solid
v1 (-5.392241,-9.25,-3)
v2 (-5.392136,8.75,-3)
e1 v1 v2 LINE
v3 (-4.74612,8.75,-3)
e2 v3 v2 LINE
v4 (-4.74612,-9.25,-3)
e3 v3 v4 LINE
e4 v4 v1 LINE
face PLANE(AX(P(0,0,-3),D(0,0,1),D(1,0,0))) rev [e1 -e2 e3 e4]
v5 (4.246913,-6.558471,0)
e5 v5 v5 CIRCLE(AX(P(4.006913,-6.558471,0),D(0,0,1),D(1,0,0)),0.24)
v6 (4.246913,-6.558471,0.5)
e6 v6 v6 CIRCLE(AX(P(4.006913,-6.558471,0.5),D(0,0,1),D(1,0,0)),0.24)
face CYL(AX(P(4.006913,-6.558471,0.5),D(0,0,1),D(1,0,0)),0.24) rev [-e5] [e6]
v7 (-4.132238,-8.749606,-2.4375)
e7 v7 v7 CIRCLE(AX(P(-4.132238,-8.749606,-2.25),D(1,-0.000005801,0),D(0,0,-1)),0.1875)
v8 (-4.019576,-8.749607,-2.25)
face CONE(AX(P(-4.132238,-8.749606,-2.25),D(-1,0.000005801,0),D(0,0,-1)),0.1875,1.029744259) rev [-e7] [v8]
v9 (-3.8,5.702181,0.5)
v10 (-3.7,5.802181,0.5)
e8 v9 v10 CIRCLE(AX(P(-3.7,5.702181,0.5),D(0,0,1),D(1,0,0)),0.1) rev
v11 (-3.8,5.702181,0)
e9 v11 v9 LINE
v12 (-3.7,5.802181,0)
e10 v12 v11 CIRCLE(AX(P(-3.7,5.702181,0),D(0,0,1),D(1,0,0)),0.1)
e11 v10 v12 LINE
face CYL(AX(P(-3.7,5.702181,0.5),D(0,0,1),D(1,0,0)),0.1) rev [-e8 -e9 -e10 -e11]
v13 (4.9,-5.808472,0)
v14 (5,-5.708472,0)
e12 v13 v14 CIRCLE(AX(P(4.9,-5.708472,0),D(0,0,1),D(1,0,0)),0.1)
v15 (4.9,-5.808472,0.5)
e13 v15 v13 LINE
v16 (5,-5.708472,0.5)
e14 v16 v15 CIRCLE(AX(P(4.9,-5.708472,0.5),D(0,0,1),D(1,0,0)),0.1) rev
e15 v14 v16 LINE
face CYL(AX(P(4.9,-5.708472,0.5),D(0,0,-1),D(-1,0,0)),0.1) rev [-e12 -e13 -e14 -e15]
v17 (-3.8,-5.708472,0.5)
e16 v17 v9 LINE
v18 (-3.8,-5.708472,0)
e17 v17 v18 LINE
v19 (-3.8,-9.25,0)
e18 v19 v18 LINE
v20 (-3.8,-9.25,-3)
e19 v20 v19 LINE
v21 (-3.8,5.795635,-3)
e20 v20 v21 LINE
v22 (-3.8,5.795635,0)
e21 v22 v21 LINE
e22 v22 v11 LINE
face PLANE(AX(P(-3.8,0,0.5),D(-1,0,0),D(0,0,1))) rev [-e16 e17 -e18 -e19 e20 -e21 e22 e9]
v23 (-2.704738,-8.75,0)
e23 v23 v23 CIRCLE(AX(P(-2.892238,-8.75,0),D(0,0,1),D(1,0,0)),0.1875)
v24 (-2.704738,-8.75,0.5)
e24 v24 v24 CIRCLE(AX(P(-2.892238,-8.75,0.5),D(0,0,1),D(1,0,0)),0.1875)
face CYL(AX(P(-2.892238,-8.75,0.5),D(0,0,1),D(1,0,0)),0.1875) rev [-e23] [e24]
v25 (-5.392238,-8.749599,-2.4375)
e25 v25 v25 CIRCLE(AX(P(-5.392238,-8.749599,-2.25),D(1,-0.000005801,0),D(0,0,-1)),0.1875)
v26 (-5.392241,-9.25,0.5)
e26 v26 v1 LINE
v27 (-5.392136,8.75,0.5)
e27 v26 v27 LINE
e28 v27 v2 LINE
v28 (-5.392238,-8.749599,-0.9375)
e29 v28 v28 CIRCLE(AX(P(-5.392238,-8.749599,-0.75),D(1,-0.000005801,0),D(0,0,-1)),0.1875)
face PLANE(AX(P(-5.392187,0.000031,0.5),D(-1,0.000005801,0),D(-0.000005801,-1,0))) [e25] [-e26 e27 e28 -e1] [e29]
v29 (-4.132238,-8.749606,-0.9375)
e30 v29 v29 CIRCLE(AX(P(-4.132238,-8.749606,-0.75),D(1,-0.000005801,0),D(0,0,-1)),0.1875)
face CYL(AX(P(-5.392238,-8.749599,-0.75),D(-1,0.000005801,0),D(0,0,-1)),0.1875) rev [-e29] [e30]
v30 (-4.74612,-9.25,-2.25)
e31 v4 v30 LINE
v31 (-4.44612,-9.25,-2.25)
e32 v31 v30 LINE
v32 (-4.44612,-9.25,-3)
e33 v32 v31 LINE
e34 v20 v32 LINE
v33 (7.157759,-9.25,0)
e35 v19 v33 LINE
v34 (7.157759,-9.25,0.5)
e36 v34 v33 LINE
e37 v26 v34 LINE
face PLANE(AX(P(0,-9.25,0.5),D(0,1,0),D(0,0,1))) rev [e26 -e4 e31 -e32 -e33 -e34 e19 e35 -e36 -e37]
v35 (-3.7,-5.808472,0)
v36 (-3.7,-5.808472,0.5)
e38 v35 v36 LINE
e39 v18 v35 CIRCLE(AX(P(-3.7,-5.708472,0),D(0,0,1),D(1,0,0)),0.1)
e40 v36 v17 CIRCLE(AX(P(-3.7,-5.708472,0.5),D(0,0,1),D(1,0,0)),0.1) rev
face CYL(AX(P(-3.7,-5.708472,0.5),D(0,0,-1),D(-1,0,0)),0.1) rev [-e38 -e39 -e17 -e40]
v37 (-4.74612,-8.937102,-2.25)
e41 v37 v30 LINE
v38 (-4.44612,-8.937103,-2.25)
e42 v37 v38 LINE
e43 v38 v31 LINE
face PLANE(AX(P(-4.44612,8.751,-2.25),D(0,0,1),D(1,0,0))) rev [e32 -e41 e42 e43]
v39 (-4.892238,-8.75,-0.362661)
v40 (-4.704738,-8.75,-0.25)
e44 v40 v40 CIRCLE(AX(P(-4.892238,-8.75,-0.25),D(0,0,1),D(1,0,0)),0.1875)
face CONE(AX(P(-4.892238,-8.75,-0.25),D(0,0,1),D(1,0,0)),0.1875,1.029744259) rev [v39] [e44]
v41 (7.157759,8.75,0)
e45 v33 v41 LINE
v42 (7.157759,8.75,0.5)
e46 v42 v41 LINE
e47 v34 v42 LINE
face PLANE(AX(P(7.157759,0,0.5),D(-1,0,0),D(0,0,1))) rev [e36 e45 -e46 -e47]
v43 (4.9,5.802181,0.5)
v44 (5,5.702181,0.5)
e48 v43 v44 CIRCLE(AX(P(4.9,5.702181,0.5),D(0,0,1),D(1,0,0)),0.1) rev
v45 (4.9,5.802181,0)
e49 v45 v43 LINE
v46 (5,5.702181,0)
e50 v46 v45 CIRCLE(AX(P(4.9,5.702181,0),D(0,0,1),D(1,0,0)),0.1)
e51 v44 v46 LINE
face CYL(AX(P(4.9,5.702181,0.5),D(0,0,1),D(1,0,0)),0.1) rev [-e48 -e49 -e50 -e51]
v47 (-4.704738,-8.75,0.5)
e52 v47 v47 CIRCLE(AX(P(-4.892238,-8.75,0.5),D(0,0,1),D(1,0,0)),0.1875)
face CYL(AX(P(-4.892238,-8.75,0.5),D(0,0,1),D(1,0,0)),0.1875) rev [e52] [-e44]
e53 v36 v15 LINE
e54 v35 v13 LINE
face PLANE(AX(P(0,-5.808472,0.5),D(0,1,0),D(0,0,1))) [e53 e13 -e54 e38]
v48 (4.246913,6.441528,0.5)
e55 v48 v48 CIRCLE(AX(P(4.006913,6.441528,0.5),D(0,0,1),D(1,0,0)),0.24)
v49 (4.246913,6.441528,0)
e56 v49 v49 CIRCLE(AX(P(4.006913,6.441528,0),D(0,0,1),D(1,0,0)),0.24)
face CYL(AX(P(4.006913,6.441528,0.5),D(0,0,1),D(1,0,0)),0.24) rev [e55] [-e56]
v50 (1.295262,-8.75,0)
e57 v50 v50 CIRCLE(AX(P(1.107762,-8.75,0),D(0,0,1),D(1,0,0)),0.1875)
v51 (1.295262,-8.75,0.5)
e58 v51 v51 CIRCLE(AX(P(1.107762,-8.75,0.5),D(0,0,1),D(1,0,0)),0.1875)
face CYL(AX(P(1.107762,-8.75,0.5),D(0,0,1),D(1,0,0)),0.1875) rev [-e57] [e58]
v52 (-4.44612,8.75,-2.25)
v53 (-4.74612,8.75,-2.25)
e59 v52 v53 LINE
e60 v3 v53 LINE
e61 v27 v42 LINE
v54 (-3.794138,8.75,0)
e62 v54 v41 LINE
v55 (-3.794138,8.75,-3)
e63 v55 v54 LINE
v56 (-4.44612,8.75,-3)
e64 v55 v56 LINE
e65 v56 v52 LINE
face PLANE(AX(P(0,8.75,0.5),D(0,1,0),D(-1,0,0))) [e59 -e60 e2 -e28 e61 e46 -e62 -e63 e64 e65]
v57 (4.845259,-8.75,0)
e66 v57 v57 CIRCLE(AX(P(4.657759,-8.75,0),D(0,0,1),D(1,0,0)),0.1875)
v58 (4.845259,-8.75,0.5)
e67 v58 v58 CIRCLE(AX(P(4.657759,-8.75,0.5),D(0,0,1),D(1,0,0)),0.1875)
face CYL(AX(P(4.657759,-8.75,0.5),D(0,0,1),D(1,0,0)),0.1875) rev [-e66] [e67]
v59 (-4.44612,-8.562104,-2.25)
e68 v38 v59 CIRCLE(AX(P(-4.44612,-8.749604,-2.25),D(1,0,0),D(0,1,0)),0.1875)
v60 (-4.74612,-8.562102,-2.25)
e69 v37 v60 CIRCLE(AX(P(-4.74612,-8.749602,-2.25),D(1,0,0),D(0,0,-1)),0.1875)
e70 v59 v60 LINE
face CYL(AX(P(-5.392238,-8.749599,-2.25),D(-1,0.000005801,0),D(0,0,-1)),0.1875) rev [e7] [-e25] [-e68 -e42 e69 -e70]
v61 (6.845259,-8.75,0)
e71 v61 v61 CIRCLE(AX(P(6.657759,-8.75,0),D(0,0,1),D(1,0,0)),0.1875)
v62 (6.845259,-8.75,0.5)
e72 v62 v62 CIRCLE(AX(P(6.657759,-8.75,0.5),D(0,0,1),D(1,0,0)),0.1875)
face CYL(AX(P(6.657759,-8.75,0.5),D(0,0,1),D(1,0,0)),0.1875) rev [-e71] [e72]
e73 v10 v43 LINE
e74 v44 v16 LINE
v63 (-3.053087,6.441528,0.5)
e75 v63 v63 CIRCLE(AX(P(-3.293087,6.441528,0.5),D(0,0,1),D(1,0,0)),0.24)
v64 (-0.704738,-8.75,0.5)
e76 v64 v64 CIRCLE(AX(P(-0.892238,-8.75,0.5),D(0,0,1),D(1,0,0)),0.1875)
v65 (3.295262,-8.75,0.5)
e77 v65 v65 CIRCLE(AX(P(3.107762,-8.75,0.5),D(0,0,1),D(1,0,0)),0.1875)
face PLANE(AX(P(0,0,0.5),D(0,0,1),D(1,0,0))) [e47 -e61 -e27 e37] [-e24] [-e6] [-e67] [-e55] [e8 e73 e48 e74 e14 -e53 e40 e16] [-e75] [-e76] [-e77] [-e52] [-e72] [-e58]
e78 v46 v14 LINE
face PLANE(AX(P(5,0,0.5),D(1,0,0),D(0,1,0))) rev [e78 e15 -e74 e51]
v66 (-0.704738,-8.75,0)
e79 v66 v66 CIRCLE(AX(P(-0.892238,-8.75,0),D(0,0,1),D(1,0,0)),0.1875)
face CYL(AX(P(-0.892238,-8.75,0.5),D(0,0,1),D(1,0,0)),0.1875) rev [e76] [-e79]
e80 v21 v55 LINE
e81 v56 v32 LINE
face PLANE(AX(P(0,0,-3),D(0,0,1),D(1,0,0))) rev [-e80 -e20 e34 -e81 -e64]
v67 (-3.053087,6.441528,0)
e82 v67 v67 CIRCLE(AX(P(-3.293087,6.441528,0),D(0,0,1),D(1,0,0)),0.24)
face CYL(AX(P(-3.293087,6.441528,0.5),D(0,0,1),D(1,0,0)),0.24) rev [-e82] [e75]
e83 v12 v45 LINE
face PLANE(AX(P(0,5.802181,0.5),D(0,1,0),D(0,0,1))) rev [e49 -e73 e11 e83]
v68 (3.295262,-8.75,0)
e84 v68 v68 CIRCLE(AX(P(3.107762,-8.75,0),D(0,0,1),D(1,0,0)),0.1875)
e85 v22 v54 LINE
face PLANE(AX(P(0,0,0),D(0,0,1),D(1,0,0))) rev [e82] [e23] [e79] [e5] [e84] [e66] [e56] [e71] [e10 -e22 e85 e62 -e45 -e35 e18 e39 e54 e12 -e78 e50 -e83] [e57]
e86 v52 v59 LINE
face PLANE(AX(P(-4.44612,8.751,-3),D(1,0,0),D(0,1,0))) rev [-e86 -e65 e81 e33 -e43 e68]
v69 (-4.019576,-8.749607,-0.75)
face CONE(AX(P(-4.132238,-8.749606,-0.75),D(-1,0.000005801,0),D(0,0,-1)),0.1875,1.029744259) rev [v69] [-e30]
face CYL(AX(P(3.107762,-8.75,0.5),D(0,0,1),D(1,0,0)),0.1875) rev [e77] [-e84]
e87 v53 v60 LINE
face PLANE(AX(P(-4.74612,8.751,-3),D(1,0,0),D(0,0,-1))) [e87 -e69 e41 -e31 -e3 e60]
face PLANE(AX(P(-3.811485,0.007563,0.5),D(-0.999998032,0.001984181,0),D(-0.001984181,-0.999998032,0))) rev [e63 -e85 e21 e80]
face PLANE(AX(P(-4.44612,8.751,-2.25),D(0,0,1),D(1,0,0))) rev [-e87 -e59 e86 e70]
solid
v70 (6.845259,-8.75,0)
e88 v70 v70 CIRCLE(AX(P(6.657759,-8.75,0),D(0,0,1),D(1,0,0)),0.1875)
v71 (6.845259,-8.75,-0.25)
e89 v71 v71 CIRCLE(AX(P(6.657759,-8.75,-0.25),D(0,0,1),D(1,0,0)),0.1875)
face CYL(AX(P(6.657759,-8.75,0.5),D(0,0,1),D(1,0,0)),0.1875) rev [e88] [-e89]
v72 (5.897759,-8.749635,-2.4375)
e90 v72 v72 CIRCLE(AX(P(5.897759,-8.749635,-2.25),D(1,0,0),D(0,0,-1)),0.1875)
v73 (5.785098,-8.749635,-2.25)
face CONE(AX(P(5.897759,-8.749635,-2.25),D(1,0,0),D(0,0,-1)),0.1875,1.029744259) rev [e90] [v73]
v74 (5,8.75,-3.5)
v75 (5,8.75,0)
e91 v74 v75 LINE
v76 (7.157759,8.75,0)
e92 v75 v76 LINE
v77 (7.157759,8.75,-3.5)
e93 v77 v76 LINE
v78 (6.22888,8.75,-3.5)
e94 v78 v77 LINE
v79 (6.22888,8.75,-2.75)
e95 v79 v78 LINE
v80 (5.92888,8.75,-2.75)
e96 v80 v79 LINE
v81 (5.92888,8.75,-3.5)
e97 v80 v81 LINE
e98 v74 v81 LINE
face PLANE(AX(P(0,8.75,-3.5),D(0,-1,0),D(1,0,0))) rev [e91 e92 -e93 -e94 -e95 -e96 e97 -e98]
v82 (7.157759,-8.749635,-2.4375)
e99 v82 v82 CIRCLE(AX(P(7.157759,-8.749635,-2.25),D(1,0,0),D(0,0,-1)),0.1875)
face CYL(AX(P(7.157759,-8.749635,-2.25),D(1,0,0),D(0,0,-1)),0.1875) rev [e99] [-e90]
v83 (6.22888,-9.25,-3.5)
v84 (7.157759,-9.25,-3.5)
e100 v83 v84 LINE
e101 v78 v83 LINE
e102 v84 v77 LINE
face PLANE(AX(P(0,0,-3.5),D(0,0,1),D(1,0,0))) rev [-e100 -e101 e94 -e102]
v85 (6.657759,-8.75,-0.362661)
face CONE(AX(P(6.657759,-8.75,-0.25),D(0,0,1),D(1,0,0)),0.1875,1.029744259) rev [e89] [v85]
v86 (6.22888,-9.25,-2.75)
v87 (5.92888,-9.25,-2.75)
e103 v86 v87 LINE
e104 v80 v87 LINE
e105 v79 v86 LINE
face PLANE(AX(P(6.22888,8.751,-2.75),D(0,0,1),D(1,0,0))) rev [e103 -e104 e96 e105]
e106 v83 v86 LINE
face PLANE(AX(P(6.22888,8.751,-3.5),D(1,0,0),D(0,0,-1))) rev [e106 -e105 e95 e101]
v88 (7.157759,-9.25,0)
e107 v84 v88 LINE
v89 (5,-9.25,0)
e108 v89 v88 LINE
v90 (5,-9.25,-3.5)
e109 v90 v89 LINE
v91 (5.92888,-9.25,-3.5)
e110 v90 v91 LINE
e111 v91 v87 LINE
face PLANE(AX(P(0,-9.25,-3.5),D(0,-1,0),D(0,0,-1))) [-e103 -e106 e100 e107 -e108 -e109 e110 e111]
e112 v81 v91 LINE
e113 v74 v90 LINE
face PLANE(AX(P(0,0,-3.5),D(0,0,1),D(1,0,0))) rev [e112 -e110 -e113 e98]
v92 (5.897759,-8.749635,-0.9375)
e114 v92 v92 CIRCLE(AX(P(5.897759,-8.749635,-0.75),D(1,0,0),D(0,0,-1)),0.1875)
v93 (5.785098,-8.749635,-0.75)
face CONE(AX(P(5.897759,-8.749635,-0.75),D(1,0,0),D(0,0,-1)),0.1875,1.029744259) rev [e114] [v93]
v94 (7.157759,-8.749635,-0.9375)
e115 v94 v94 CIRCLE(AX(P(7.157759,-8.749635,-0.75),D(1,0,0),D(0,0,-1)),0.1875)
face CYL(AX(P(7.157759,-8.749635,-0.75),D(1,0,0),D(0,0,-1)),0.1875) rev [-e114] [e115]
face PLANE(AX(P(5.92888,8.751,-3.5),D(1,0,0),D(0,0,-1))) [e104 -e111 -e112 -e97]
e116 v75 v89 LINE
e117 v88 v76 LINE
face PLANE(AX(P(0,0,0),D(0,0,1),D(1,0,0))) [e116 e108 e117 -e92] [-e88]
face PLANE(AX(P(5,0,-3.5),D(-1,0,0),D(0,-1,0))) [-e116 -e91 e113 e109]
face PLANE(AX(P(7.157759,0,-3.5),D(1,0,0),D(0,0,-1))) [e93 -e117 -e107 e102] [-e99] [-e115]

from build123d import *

# Parameters (mm, degrees)
BOSS_EXTRUDE1_DEPTH                = 0.5
SKETCH4_3_W                        = 2.157759448
SKETCH4_3_H                        = 18
BOSS_EXTRUDE2_DEPTH                = 3.5
BOSS_EXTRUDE3_DEPTH                = 3
FILLET1_R                          = 0.1
SKETCH26_W                         = 0.24
SKETCH26_H                         = 4
SKETCH28_W                         = 0.3
SKETCH28_H                         = 0.75
CUT_EXTRUDE1_DEPTH                 = 18
M0_5X0_125_TAPPED_HOLE1_AT_2_COUNT = 2
M0_5X0_125_TAPPED_HOLE1_AT_2_PITCH = 11.549997101
M0_5X0_125_TAPPED_HOLE1_AT_3_COUNT = 2
M0_5X0_125_TAPPED_HOLE1_AT_3_PITCH = 2
M0_5X0_125_TAPPED_HOLE1_AT_4_COUNT = 2
M0_5X0_125_TAPPED_HOLE1_AT_4_PITCH = 4
M0_5X0_125_TAPPED_HOLE1_AT_5_COUNT = 2
M0_5X0_125_TAPPED_HOLE1_AT_5_PITCH = 6
M0_5X0_125_TAPPED_HOLE1_AT_6_COUNT = 2
M0_5X0_125_TAPPED_HOLE1_AT_6_PITCH = 8
M0_5X0_125_TAPPED_HOLE1_AT_7_COUNT = 2
M0_5X0_125_TAPPED_HOLE1_AT_7_PITCH = 9.549997101
M0_5X0_125_TAPPED_HOLE2_AT_2_COUNT = 2
M0_5X0_125_TAPPED_HOLE2_AT_2_PITCH = 1.5
MIRROR9_START                      = -6
MIRROR9_OUTLINE_R                  = 0.1875
MIRROR9_DEPTH                      = 1.867813005


with BuildPart() as part:
    # Sketch4 → Boss-Extrude1 (new body)
    with BuildSketch(Plane(origin=(5.549975664, -0.767698462, 0), x_dir=(1, 0, 0), z_dir=(0, 0, 1))):
        Polygon((-10.942216218, -8.482301538), (1.607783784, -8.482301538), (1.607783784, 9.517698462), (-10.942111801, 9.517698462), align=None)
        Polygon((-0.549975664, -5.040773631), (-9.349975664, -5.040773631), (-9.349975664, 6.563333727), (-9.349962677, 6.569879134), (-0.549975664, 6.569879134), align=None, mode=Mode.SUBTRACT)
    extrude(amount=BOSS_EXTRUDE1_DEPTH)

    # Sketch4<5> → Boss-Extrude3 (add)
    with BuildSketch(Plane(origin=(5.549975664, -0.767698462, 0), x_dir=(1, 0, 0), z_dir=(0, 0, 1))):
        Polygon((-10.942216218, -8.482301538), (-9.349975664, -8.482301538), (-9.349975664, 6.563333727), (-9.34411366, 9.517698462), (-10.942111801, 9.517698462), align=None)
    extrude(amount=-BOSS_EXTRUDE3_DEPTH)

    # Fillet1
    # the kernel refuses this fillet: 0.1 mm, written as the material it adds along each edge
    with BuildSketch(Plane(origin=(-3.8, -5.808472093, 0), x_dir=(1, 0, 0), z_dir=(0, 0, 1)), Plane(origin=(5, -5.808472093, 0), x_dir=(0, 1, 0), z_dir=(0, 0, 1)), Plane(origin=(5, 5.802180672, 0), x_dir=(-1, 0, 0), z_dir=(0, 0, 1))) as fillet1_piece_1:
        with BuildLine():
            CenterArc((FILLET1_R, FILLET1_R), FILLET1_R, 180, 90)
            Line((0, FILLET1_R), (0, 0))
            Line((0, 0), (FILLET1_R, 0))
        make_face()
    extrude(amount=0.5)
    with BuildSketch(Plane(origin=(-3.799987013, 5.802180672, 0), x_dir=(-0.0001298729448490843, -0.9999999915665091, 0), z_dir=(0, 0, 1))) as fillet1_piece_2:
        with BuildLine():
            CenterArc((0.099987014, 0.099999999), FILLET1_R, 180.007441172, 90)
            Line((-1.2986e-05, 0.099987012), (-0.010012986, 0.099985713))
            Line((-0.010012986, 0.099985713), (-0.01, -1.299e-06))
            Line((-0.01, -1.299e-06), (-1.8543e-05, -0.009999983))
            ThreePointArc((-1.8543e-05, -0.009999983), (0.006546707, -0.010012137), (0.1000013, -0.01))
            Line((0.1000013, -0.01), (0.100000001, 0))
        make_face()
    extrude(amount=0.5)

    # Sketch26 → M0.6x0.15 Tapped Hole - pcb mount (revolve, cut)
    with BuildSketch(Plane(origin=(-3.293086815, 6.441527579, 0.5), x_dir=(0, -1, 0), z_dir=(1, 0, 0))):
        with Locations((0.12, 2)):
            Rectangle(SKETCH26_W, SKETCH26_H)
    revolve(axis=Axis((-3.293086815, 6.441527579, 6.85), (0, 0, -1)), mode=Mode.SUBTRACT)


with BuildPart() as body_2:
    # Sketch4<3> → Boss-Extrude2 (new body)
    with BuildSketch(Plane(origin=(5.549975664, -0.767698462, 0), x_dir=(1, 0, 0), z_dir=(0, 0, 1))):
        with Locations((0.52890406, 0.517698462)):
            Rectangle(SKETCH4_3_W, SKETCH4_3_H)
    extrude(amount=-BOSS_EXTRUDE2_DEPTH)


with BuildPart() as cut_extrude1_tool:
    # Sketch28 → Cut-Extrude1 (new body)
    with BuildSketch(Plane(origin=(0, -9.25, 0), x_dir=(-1, 0, 0), z_dir=(0, -1, 0))):
        with Locations((4.596120277, 2.625)):
            Rectangle(SKETCH28_W, SKETCH28_H)
        with Locations((-6.078879724, 3.125)):
            Rectangle(SKETCH28_W, SKETCH28_H)
    extrude(amount=-CUT_EXTRUDE1_DEPTH)


with BuildPart() as part_1:
    add(part.part)

    # Cut-Extrude1: cut by cut_extrude1_tool
    add(cut_extrude1_tool.part, mode=Mode.SUBTRACT)

    # Sketch30 → M0.5x0.125 Tapped Hole1 (revolve, cut)
    with BuildSketch(Plane(origin=(-4.892237653, -8.75, 0.5), x_dir=(0, -1, 0), z_dir=(1, 0, 0))):
        Polygon((0, 0), (0, 0.862661366), (0.1875, 0.75), (0.1875, 0), align=None)
    m0_5x0_125_tapped_hole1 = revolve(axis=Axis((-4.892237653, -8.75, 6.85), (0, 0, -1)), mode=Mode.SUBTRACT)


with BuildPart() as body_2_1:
    add(body_2.part)

    # Cut-Extrude1: cut by cut_extrude1_tool
    add(cut_extrude1_tool.part, mode=Mode.SUBTRACT)


with BuildPart() as m0_5x0_125_tapped_hole1_at_2_tool:
    # M0.5x0.125 Tapped Hole1 at 2: M0.5x0.125 Tapped Hole1 ×2
    with Locations(*[(i * M0_5X0_125_TAPPED_HOLE1_AT_2_PITCH, 0, 0) for i in range(1, M0_5X0_125_TAPPED_HOLE1_AT_2_COUNT)]):
        add(m0_5x0_125_tapped_hole1)


with BuildPart() as part_2:
    add(part_1.part)

    # M0.5x0.125 Tapped Hole1 at 2: cut by m0_5x0_125_tapped_hole1_at_2_tool
    add(m0_5x0_125_tapped_hole1_at_2_tool.part, mode=Mode.SUBTRACT)

    # M0.5x0.125 Tapped Hole1 at 3: M0.5x0.125 Tapped Hole1 ×2
    with Locations(*[(i * M0_5X0_125_TAPPED_HOLE1_AT_3_PITCH, 0, 0) for i in range(1, M0_5X0_125_TAPPED_HOLE1_AT_3_COUNT)]):
        add(m0_5x0_125_tapped_hole1, mode=Mode.SUBTRACT)

    # M0.5x0.125 Tapped Hole1 at 4: M0.5x0.125 Tapped Hole1 ×2
    with Locations(*[(i * M0_5X0_125_TAPPED_HOLE1_AT_4_PITCH, 0, 0) for i in range(1, M0_5X0_125_TAPPED_HOLE1_AT_4_COUNT)]):
        add(m0_5x0_125_tapped_hole1, mode=Mode.SUBTRACT)

    # M0.5x0.125 Tapped Hole1 at 5: M0.5x0.125 Tapped Hole1 ×2
    with Locations(*[(i * M0_5X0_125_TAPPED_HOLE1_AT_5_PITCH, 0, 0) for i in range(1, M0_5X0_125_TAPPED_HOLE1_AT_5_COUNT)]):
        add(m0_5x0_125_tapped_hole1, mode=Mode.SUBTRACT)

    # M0.5x0.125 Tapped Hole1 at 6: M0.5x0.125 Tapped Hole1 ×2
    with Locations(*[(i * M0_5X0_125_TAPPED_HOLE1_AT_6_PITCH, 0, 0) for i in range(1, M0_5X0_125_TAPPED_HOLE1_AT_6_COUNT)]):
        add(m0_5x0_125_tapped_hole1, mode=Mode.SUBTRACT)

    # M0.5x0.125 Tapped Hole1 at 7: M0.5x0.125 Tapped Hole1 ×2
    with Locations(*[(i * M0_5X0_125_TAPPED_HOLE1_AT_7_PITCH, 0, 0) for i in range(1, M0_5X0_125_TAPPED_HOLE1_AT_7_COUNT)]):
        add(m0_5x0_125_tapped_hole1, mode=Mode.SUBTRACT)

    # Mirror9: read off the stored shape, not the designer's step
    # Mirror9 outline → Mirror9 (cut)
    with BuildSketch(Plane(origin=(0, 0, 0), x_dir=(5.800925593088129e-06, 0.9999999999831747, 0), z_dir=(0.9999999999831748, -5.8009255930881285e-06, 0)).offset(MIRROR9_START)):
        with Locations((-8.749630019, -0.75)):
            Circle(MIRROR9_OUTLINE_R)
        with Locations((-8.749630019, -2.25)):
            Circle(MIRROR9_OUTLINE_R)
    extrude(amount=MIRROR9_DEPTH, mode=Mode.SUBTRACT)

    # Mirror9 2 outline → Mirror9 2 (revolve, cut)
    with BuildSketch(Plane(origin=(-5.0756e-05, -8.749630019, -0.75), x_dir=(5.800925593088129e-06, 0.9999999999831747, 0), z_dir=(0, 0, -1))):
        Polygon((0.1875, -4.132186895), (0, -4.019525529), (0, -4.132186995), align=None)
    revolve(axis=Axis((-5.0756e-05, -8.749630019, -0.75), (0.9999999999831749, -5.800925593088131e-06, 0)), mode=Mode.SUBTRACT)

    # Mirror9 3 outline → Mirror9 3 (revolve, cut)
    with BuildSketch(Plane(origin=(-5.0756e-05, -8.749630019, -2.25), x_dir=(5.800925593088129e-06, 0.9999999999831747, 0), z_dir=(0, 0, -1))):
        Polygon((0.1875, -4.132186895), (0, -4.019525529), (0, -4.132186995), align=None)
    revolve(axis=Axis((-5.0756e-05, -8.749630019, -2.25), (0.9999999999831749, -5.800925593088131e-06, 0)), mode=Mode.SUBTRACT)

    # Sketch45 → M0.6x0.15 Tapped Hole1 (revolve, cut)
    with BuildSketch(Plane(origin=(4.006913198, 6.441527579, 0.5), x_dir=(0, -1, 0), z_dir=(1, 0, 0))):
        Polygon((0, 0), (0, 1.144206549), (0.24, 1), (0.24, 0), align=None)
    revolve(axis=Axis((4.006913198, 6.441527579, 6.85), (0, 0, -1)), mode=Mode.SUBTRACT)

    # Sketch50 → M0.6x0.15 Tapped Hole2 (revolve, cut)
    with BuildSketch(Plane(origin=(4.006913151, -6.558470788, 0.5), x_dir=(0, -1, 0), z_dir=(1, 0, 0))):
        Polygon((0, 0), (0, 1.794206549), (0.24, 1.65), (0.24, 0), align=None)
    revolve(axis=Axis((4.006913151, -6.558470788, 6.85), (0, 0, -1)), mode=Mode.SUBTRACT)


with BuildPart() as body_2_2:
    add(body_2_1.part)

    # M0.5x0.125 Tapped Hole1 at 2: cut by m0_5x0_125_tapped_hole1_at_2_tool
    add(m0_5x0_125_tapped_hole1_at_2_tool.part, mode=Mode.SUBTRACT)

    # Sketch32 → M0.5x0.125 Tapped Hole2 (revolve, cut)
    with BuildSketch(Plane(origin=(7.157759448, -8.74963514, -0.75), x_dir=(0, 0, -1), z_dir=(0, 1, 0))):
        Polygon((0, 0), (0, 1.372661366), (0.1875, 1.26), (0.1875, 0), align=None)
    m0_5x0_125_tapped_hole2 = revolve(axis=Axis((13.507759448, -8.74963514, -0.75), (-1, 0, 0)), mode=Mode.SUBTRACT)

    # M0.5x0.125 Tapped Hole2 at 2: M0.5x0.125 Tapped Hole2 ×2
    with Locations(*[(0, 0, -i * M0_5X0_125_TAPPED_HOLE2_AT_2_PITCH) for i in range(1, M0_5X0_125_TAPPED_HOLE2_AT_2_COUNT)]):
        add(m0_5x0_125_tapped_hole2, mode=Mode.SUBTRACT)


solid = Compound([part_2.part, body_2_2.part])
